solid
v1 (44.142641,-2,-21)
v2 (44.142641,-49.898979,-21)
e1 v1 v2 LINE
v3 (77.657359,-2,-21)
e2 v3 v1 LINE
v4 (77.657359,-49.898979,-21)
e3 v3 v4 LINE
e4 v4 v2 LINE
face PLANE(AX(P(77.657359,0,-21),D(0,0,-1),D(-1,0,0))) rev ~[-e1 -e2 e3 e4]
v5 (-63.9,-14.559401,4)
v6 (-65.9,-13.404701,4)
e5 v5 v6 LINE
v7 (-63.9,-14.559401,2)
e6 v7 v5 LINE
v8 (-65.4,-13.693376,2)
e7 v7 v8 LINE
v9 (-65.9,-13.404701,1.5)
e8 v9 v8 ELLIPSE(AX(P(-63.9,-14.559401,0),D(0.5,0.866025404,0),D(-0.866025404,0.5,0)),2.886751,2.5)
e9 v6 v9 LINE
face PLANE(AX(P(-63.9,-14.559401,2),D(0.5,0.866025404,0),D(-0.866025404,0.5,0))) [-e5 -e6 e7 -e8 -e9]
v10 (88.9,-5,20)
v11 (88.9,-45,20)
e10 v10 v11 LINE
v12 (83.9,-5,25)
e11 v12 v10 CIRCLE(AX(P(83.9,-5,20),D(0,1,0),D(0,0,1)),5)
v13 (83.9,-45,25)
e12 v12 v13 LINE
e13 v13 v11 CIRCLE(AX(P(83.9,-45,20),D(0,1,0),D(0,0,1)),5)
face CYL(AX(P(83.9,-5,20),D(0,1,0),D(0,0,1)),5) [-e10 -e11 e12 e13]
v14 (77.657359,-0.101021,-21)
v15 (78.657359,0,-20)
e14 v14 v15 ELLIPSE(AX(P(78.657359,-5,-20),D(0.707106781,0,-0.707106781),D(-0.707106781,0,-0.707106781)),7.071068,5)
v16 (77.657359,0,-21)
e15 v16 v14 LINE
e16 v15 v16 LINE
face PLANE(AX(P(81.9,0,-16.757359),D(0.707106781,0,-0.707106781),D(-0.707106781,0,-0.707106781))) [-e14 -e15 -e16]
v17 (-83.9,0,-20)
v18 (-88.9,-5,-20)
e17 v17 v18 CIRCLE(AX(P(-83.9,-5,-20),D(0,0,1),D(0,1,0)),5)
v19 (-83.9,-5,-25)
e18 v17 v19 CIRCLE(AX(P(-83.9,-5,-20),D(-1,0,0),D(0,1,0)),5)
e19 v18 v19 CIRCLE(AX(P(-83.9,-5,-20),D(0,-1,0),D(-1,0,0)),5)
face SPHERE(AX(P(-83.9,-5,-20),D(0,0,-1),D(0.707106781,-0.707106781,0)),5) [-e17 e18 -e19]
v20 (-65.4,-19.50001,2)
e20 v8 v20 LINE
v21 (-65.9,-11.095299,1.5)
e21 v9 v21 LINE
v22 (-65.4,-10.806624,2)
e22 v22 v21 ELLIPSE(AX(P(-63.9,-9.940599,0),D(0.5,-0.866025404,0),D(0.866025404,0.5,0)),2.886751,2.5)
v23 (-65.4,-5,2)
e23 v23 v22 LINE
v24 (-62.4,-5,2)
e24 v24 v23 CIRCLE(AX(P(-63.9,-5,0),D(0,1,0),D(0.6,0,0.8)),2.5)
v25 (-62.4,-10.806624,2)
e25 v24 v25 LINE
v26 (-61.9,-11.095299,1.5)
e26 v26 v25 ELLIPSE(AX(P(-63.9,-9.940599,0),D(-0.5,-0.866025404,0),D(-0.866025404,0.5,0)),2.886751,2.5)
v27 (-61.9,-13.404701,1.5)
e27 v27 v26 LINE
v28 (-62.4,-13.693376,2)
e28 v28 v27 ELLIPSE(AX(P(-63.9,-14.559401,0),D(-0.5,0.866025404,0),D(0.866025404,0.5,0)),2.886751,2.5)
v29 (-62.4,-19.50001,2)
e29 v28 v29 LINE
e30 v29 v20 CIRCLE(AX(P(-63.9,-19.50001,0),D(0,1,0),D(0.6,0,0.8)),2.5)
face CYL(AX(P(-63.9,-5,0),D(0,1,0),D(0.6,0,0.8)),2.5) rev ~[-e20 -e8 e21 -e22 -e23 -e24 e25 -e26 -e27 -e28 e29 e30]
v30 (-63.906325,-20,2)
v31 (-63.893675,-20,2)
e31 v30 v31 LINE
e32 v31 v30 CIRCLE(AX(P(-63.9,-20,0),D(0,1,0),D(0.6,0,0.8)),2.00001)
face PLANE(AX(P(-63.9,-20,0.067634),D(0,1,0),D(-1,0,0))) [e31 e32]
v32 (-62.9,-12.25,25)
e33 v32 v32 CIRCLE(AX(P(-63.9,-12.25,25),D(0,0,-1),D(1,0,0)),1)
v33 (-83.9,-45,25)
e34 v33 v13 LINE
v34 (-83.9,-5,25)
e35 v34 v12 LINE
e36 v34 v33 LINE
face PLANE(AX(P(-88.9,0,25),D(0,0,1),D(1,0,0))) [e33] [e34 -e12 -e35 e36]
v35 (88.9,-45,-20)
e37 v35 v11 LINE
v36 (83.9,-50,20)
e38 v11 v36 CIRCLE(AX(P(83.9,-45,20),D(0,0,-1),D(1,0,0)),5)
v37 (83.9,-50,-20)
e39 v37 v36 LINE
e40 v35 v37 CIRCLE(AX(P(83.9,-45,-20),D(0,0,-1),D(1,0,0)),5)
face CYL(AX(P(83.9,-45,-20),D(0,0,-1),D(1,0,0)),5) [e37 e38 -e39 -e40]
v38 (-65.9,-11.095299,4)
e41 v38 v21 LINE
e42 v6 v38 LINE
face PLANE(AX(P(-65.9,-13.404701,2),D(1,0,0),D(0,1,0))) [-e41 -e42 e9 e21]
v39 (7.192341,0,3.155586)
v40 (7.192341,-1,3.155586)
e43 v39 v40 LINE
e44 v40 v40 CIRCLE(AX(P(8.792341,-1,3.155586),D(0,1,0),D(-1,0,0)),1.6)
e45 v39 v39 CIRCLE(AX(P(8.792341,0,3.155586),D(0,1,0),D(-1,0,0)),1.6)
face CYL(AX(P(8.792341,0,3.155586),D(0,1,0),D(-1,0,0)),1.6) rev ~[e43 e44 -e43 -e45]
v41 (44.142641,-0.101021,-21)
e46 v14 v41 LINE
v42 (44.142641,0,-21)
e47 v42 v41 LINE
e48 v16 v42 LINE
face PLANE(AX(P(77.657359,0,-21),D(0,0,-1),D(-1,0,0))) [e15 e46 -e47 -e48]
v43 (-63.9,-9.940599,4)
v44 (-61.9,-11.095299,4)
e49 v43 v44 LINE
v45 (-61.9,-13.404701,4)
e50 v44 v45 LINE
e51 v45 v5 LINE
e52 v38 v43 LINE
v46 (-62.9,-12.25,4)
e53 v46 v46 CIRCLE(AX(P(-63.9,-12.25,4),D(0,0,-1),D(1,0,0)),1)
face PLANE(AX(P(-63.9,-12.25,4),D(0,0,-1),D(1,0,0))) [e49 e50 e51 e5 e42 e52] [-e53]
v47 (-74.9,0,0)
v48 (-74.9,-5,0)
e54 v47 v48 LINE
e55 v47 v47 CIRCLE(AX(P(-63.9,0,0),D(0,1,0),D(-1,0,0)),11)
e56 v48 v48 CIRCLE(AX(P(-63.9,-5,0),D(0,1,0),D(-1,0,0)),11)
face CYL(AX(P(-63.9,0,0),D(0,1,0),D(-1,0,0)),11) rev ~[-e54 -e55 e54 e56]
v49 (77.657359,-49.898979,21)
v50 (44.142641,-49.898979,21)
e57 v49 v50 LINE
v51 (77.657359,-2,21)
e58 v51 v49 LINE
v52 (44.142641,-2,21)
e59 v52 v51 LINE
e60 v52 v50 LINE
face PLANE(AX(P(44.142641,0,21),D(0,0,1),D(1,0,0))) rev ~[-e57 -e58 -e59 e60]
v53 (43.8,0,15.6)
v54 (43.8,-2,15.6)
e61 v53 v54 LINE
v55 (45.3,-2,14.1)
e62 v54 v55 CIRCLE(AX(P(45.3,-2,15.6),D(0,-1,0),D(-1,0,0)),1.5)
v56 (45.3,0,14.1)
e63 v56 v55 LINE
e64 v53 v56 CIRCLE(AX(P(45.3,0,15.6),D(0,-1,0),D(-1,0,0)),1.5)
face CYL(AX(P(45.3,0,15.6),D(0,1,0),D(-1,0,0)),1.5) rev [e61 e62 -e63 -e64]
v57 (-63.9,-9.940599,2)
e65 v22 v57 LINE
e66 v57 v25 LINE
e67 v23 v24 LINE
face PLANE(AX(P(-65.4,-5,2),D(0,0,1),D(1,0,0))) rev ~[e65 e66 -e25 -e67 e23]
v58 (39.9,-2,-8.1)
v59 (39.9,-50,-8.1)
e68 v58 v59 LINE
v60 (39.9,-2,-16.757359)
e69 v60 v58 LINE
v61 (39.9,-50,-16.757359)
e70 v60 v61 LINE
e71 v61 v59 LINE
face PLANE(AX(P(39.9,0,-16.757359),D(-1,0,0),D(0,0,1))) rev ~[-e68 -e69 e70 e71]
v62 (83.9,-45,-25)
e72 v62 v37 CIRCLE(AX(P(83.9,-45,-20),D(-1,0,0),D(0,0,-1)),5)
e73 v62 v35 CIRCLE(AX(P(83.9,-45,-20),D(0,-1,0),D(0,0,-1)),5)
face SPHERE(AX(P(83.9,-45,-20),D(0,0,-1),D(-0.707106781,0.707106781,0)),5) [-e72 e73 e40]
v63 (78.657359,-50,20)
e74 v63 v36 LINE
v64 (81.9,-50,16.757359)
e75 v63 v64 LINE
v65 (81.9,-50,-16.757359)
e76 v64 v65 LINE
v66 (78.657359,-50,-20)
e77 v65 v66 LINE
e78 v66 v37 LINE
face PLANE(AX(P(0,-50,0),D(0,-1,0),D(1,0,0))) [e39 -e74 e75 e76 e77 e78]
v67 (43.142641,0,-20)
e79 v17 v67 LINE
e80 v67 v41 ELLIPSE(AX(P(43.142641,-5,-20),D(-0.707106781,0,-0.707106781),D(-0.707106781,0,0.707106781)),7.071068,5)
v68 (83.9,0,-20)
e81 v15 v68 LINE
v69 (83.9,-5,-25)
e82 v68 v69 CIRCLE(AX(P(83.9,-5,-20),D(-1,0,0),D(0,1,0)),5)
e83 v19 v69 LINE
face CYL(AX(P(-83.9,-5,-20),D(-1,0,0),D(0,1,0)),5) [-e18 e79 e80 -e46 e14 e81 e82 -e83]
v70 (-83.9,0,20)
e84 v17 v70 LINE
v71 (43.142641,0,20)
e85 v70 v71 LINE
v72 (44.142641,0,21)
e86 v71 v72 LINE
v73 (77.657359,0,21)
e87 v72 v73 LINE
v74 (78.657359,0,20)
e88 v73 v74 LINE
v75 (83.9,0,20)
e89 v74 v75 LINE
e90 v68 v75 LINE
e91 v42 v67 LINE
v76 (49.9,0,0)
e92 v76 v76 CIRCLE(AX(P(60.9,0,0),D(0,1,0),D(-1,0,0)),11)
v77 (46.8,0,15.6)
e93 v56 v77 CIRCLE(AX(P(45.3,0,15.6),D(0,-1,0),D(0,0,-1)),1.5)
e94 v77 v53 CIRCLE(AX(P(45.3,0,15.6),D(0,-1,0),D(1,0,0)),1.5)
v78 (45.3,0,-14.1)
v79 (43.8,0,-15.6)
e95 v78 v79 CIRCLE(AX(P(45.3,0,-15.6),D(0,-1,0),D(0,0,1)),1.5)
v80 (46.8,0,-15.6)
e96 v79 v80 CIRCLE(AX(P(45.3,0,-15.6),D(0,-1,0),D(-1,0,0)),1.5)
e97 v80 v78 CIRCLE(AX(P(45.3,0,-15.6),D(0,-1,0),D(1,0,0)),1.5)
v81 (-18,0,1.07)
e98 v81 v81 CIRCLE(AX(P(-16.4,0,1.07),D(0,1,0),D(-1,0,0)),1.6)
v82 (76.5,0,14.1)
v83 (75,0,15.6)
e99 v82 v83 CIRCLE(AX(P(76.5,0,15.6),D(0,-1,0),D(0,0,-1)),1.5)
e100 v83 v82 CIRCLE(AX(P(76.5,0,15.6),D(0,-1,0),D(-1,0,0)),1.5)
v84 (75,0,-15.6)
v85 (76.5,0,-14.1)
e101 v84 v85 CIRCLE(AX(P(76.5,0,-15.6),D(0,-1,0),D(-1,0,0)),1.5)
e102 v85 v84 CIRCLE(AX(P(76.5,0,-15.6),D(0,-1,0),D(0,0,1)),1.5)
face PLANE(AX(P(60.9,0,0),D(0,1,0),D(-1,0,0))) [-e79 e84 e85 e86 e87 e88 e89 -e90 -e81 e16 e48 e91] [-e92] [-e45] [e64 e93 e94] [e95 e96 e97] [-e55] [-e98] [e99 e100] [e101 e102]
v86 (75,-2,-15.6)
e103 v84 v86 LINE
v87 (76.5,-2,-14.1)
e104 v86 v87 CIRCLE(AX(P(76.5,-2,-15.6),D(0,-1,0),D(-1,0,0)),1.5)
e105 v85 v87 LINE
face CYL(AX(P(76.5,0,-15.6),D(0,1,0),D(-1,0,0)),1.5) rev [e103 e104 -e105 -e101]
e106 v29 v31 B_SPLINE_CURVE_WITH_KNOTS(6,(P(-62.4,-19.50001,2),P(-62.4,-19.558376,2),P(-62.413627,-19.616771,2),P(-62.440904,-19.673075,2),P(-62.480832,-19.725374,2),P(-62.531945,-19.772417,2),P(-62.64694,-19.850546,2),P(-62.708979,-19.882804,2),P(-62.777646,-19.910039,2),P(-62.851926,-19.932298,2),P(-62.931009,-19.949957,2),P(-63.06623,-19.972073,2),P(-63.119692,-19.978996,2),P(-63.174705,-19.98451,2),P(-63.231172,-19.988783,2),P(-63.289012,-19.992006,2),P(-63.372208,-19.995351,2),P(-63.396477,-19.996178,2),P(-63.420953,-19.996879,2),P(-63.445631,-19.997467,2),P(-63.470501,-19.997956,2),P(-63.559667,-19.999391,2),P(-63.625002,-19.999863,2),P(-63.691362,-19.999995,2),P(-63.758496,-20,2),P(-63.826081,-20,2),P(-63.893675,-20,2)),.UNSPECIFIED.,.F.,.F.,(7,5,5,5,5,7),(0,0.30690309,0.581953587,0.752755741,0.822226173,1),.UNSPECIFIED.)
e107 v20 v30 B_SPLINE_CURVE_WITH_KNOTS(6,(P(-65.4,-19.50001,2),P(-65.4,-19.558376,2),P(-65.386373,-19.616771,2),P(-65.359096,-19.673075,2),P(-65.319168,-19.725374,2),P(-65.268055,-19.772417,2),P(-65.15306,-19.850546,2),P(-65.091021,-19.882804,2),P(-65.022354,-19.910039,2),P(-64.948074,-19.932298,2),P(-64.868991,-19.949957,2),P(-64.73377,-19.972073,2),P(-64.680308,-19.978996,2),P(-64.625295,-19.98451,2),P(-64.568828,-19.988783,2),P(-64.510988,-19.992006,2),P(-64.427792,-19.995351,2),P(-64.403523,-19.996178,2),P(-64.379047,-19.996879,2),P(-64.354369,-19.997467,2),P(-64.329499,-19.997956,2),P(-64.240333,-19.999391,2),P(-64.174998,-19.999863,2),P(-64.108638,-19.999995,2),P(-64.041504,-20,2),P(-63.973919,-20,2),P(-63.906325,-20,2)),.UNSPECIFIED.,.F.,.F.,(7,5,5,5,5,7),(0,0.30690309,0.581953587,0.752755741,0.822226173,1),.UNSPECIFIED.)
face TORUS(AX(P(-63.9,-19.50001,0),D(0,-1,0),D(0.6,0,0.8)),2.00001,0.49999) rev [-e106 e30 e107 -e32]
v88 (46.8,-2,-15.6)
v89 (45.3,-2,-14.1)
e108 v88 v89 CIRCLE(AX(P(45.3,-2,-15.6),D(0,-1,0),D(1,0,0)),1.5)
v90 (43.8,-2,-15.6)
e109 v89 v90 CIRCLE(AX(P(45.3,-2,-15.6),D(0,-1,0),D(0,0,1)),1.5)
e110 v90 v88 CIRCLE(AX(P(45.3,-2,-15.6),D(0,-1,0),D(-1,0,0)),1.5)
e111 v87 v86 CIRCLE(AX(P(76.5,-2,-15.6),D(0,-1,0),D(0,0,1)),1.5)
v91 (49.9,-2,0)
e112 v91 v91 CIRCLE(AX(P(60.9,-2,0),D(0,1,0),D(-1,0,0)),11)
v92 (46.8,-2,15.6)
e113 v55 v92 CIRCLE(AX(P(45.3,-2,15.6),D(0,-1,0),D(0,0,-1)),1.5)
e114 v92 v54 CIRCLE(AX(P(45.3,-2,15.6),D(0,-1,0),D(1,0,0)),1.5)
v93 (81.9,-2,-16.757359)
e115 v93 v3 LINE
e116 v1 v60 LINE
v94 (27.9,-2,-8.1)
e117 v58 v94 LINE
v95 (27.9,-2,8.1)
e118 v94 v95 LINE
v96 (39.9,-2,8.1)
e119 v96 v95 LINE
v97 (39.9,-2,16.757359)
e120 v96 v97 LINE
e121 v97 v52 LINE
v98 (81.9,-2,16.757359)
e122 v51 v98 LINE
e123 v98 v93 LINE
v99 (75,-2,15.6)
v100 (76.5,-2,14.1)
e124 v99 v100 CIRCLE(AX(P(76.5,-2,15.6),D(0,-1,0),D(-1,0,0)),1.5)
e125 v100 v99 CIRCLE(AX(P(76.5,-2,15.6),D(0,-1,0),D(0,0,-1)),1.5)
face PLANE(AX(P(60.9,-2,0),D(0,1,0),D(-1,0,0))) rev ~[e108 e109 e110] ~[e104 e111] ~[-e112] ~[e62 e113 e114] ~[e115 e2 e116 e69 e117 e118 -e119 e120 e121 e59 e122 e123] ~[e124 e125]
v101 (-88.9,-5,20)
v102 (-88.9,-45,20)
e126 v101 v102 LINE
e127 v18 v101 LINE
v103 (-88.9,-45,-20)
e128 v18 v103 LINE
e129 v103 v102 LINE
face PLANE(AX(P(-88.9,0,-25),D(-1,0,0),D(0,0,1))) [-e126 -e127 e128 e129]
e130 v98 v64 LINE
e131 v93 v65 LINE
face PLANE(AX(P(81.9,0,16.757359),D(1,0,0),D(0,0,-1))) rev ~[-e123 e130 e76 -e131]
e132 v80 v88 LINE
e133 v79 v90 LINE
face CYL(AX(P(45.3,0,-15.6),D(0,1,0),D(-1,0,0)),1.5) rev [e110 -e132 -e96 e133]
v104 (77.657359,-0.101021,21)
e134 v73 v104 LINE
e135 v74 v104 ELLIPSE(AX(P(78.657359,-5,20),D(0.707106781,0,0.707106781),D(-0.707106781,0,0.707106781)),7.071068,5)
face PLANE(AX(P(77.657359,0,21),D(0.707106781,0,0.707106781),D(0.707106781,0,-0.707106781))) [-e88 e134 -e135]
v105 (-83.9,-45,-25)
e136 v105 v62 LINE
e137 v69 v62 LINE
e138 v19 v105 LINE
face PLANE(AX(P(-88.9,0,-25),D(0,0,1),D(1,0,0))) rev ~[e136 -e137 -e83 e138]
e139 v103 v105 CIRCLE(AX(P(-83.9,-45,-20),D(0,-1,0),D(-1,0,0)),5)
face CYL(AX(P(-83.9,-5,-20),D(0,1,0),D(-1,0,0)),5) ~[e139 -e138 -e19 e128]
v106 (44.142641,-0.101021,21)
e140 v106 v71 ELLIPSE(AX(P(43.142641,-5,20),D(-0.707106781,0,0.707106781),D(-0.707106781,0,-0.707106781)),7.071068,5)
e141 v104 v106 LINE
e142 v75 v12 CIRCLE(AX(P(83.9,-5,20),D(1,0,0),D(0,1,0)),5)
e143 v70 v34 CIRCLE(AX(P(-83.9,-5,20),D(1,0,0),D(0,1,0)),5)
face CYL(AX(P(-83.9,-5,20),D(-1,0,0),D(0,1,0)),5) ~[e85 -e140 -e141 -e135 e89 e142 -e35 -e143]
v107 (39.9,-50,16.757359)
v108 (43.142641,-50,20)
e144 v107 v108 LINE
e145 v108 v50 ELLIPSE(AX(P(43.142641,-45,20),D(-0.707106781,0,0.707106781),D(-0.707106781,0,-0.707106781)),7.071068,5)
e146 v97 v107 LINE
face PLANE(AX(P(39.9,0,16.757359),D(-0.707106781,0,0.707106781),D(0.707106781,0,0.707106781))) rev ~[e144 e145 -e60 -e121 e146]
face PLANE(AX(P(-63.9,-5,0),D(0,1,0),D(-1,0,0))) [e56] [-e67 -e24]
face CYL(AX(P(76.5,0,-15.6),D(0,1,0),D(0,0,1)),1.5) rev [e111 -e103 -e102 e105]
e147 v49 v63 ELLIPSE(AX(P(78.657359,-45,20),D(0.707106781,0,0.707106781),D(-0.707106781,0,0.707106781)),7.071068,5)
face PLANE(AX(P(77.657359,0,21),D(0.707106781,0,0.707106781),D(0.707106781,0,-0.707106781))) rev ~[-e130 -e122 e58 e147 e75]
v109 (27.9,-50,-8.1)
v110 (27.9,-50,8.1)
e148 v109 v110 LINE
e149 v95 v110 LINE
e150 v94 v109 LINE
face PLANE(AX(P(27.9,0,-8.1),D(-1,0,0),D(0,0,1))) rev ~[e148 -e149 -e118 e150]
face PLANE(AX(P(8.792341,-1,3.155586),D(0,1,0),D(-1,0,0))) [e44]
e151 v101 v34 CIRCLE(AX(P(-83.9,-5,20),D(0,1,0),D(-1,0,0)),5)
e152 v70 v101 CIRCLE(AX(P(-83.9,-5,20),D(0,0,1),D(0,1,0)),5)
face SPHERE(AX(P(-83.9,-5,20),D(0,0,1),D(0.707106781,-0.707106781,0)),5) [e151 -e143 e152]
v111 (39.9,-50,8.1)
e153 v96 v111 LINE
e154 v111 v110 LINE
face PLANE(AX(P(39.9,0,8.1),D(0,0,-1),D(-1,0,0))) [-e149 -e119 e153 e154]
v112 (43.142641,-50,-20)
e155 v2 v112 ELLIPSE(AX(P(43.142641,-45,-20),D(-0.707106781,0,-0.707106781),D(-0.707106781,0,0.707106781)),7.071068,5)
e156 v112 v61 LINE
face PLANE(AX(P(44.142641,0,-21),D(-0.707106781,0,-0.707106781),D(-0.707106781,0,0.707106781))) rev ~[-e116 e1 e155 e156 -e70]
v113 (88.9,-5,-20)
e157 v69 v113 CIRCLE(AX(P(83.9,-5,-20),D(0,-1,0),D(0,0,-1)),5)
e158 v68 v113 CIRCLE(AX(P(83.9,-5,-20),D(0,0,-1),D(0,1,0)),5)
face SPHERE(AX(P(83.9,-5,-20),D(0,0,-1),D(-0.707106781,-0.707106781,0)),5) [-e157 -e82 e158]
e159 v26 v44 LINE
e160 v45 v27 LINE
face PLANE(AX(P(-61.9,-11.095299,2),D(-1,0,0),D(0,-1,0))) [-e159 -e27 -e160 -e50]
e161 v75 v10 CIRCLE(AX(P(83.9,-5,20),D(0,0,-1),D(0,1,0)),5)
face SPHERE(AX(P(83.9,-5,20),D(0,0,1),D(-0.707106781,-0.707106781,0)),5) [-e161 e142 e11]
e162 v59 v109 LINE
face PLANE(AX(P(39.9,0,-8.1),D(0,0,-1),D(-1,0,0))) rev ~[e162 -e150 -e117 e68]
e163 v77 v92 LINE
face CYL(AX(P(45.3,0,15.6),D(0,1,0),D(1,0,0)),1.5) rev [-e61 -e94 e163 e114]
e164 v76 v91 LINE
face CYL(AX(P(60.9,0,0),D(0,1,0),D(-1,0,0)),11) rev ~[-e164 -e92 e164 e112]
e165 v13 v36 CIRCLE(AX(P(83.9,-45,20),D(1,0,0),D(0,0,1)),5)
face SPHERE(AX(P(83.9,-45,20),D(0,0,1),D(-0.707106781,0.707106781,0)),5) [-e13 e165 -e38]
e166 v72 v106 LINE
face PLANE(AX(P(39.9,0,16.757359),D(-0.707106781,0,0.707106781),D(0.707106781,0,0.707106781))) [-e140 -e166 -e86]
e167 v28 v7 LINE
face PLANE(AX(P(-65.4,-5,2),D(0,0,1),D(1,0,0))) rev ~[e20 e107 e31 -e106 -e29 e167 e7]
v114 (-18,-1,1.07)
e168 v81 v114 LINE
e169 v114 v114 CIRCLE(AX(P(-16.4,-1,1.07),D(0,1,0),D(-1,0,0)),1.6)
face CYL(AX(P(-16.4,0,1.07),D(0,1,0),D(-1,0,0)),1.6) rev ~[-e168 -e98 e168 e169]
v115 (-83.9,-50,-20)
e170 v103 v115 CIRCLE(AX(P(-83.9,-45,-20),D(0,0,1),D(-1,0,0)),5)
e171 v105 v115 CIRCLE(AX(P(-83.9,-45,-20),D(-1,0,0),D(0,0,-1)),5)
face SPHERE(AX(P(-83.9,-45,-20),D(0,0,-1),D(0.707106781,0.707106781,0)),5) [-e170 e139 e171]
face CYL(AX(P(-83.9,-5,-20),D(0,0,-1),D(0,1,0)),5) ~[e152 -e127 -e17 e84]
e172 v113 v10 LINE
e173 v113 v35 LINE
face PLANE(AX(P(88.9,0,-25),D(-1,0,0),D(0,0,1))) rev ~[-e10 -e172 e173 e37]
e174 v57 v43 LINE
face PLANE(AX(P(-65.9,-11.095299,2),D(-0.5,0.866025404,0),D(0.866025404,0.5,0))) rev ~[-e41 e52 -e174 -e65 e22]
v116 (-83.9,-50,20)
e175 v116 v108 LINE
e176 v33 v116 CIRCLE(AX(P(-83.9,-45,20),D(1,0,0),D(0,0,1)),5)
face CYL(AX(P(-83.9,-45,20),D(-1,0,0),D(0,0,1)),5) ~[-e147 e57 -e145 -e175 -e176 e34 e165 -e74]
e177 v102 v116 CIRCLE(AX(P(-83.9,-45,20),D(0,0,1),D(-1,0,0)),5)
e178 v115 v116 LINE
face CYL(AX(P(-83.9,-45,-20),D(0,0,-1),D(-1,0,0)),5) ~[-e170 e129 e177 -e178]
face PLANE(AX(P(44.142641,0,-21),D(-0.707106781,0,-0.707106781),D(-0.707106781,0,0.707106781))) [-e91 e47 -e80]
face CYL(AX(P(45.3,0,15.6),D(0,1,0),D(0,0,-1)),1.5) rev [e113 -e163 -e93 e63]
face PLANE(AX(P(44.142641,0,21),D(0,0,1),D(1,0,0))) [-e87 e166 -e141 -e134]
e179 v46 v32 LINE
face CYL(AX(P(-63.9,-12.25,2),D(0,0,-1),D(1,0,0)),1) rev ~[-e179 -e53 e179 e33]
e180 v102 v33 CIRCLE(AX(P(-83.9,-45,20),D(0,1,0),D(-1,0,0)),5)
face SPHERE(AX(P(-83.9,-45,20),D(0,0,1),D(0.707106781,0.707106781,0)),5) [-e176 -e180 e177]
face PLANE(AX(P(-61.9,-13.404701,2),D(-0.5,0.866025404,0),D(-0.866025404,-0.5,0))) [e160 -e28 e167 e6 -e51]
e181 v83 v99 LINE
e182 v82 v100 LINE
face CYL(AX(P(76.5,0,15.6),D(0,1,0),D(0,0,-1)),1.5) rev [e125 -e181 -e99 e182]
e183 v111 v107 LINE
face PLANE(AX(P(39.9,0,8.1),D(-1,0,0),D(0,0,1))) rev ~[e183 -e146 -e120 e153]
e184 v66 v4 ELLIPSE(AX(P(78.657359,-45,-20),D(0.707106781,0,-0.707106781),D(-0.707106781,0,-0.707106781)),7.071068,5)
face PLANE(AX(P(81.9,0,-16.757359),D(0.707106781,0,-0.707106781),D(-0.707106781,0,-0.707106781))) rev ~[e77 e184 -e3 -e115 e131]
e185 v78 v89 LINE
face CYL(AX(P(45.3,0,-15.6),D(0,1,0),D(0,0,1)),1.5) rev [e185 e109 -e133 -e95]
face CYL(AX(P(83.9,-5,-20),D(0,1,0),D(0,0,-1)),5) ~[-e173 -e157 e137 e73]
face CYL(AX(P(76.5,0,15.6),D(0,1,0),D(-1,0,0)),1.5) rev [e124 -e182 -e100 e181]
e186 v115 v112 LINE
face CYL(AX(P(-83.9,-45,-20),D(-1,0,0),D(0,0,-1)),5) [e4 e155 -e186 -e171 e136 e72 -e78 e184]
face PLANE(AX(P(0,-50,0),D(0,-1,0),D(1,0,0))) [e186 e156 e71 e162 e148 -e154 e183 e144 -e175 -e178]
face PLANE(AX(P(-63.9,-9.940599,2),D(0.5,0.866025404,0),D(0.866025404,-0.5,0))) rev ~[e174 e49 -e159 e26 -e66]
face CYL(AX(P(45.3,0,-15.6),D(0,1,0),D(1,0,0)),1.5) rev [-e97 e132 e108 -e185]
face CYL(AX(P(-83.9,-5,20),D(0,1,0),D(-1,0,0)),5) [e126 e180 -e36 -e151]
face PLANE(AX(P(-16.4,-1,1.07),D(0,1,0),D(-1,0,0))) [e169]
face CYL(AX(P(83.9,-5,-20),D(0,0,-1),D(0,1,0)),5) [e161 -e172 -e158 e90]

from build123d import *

# Parameters (mm, degrees)
F0_W           = 177.8
F0_H           = 50
F1_DEPTH       = 50
F2_W           = 12
F2_H           = 16.2
F3_DEPTH       = 50
F4_R           = 11
F5_DEPTH       = 5
F7_DEPTH       = 15
F8_R           = 0.49999
F9_T1_DEPTH    = 40
F9_T3_DEPTH    = 167.8
F9_T5_DEPTH    = 40
F9_S9_W        = 5
F9_S9_H        = 5
F9_T10_DEPTH   = 5
F9_S15_W       = 5
F9_S15_H       = 5
F9_T16_DEPTH   = 5
F9_S21_W       = 5
F9_S21_H       = 5
F9_T22_DEPTH   = 5
F9_S27_W       = 5
F9_S27_H       = 5
F9_T28_DEPTH   = 5
F9_S33_W       = 5
F9_S33_H       = 5
F9_T34_DEPTH   = 5
F9_S39_W       = 5
F9_S39_H       = 5
F9_T40_DEPTH   = 5
F9_S45_W       = 5
F9_S45_H       = 5
F9_T46_DEPTH   = 5
F9_S51_W       = 5
F9_S51_H       = 5
F9_T52_DEPTH   = 5
F10_R          = 1.6
F11_DEPTH      = 1
F12_R          = 1
F13_DEPTH      = 2
F13_DEPTH_BACK = 1
F14_DEPTH      = 25
F15_DEPTH      = 2
F16_R          = 11
F17_DEPTH      = 25


# Not quite as in the source:
# - a fillet or chamfer that OpenCascade refuses, or shapes differently, is made with other operations: its cross-section is extruded or revolved along the edge and cut away or added
# - a fillet or chamfer is up to 0.001 mm smaller than in the source, because OpenCascade refuses the exact size


with BuildPart() as f1:
    # F0 (on Front) → F1 (new body)
    with BuildSketch(Plane.XZ):
        Rectangle(F0_W, F0_H)
    extrude(amount=F1_DEPTH)

    # F2 (on face) → F3 (cut, through all)
    with BuildSketch(Plane(origin=(0, 0, 0), x_dir=(-1, 0, 0), z_dir=(0, 1, 0))):
        Polygon((-44.1426406871, 21), (-77.6573593129, 21), (-81.9, 16.7573593129), (-81.9, -16.7573593129), (-77.6573593129, -21), (-44.1426406871, -21), (-39.9, -16.7573593129), (-39.9, -8.1), (-39.9, 8.1), (-39.9, 16.7573593129), align=None)
        with BuildLine():
            ThreePointArc((-75, -15.6), (-77.5606601718, -16.6606601718), (-76.5, -14.1))
            Line((-76.5, -14.1), (-76.5, 14.1))
            ThreePointArc((-76.5, 14.1), (-77.5606601718, 16.6606601718), (-75, 15.6))
            Line((-75, 15.6), (-46.8, 15.6))
            ThreePointArc((-46.8, 15.6), (-45.3, 17.1), (-43.8, 15.6))
            ThreePointArc((-43.8, 15.6), (-44.2393398282, 14.5393398282), (-45.3, 14.1))
            Line((-45.3, 14.1), (-45.3, -14.1))
            ThreePointArc((-45.3, -14.1), (-44.2393398282, -14.5393398282), (-43.8, -15.6))
            ThreePointArc((-43.8, -15.6), (-45.3, -17.1), (-46.8, -15.6))
            Line((-46.8, -15.6), (-75, -15.6))
        make_face(mode=Mode.SUBTRACT)
        with Locations((-33.9, 0)):
            Rectangle(F2_W, F2_H)
        with BuildLine():
            Line((-75, -15.6), (-76.5, -15.6))
            Line((-76.5, -15.6), (-76.5, -14.1))
            ThreePointArc((-76.5, -14.1), (-77.5606601718, -16.6606601718), (-75, -15.6))
        make_face()
        with BuildLine():
            Line((-76.5, -14.1), (-76.5, -15.6))
            Line((-76.5, -15.6), (-75, -15.6))
            ThreePointArc((-75, -15.6), (-75.4393398282, -14.5393398282), (-76.5, -14.1))
        make_face()
        with BuildLine():
            Line((-76.5, 14.1), (-76.5, -14.1))
            ThreePointArc((-76.5, -14.1), (-75.4393398282, -14.5393398282), (-75, -15.6))
            Line((-75, -15.6), (-46.8, -15.6))
            ThreePointArc((-46.8, -15.6), (-46.3606601718, -14.5393398282), (-45.3, -14.1))
            Line((-45.3, -14.1), (-45.3, 14.1))
            ThreePointArc((-45.3, 14.1), (-46.3606601718, 14.5393398282), (-46.8, 15.6))
            Line((-46.8, 15.6), (-75, 15.6))
            ThreePointArc((-75, 15.6), (-75.4393398282, 14.5393398282), (-76.5, 14.1))
        make_face()
        with BuildLine():
            ThreePointArc((-75, 15.6), (-77.5606601718, 16.6606601718), (-76.5, 14.1))
            Line((-76.5, 14.1), (-76.5, 15.6))
            Line((-76.5, 15.6), (-75, 15.6))
        make_face()
        with BuildLine():
            Line((-76.5, 15.6), (-76.5, 14.1))
            ThreePointArc((-76.5, 14.1), (-75.4393398282, 14.5393398282), (-75, 15.6))
            Line((-75, 15.6), (-76.5, 15.6))
        make_face()
        with BuildLine():
            ThreePointArc((-45.3, -14.1), (-46.3606601718, -14.5393398282), (-46.8, -15.6))
            Line((-46.8, -15.6), (-45.3, -15.6))
            Line((-45.3, -15.6), (-45.3, -14.1))
        make_face()
        with BuildLine():
            Line((-45.3, -15.6), (-46.8, -15.6))
            ThreePointArc((-46.8, -15.6), (-45.3, -17.1), (-43.8, -15.6))
            ThreePointArc((-43.8, -15.6), (-44.2393398282, -14.5393398282), (-45.3, -14.1))
            Line((-45.3, -14.1), (-45.3, -15.6))
        make_face()
        with BuildLine():
            ThreePointArc((-43.8, 15.6), (-45.3, 17.1), (-46.8, 15.6))
            Line((-46.8, 15.6), (-45.3, 15.6))
            Line((-45.3, 15.6), (-45.3, 14.1))
            ThreePointArc((-45.3, 14.1), (-44.2393398282, 14.5393398282), (-43.8, 15.6))
        make_face()
        with BuildLine():
            Line((-45.3, 15.6), (-46.8, 15.6))
            ThreePointArc((-46.8, 15.6), (-46.3606601718, 14.5393398282), (-45.3, 14.1))
            Line((-45.3, 14.1), (-45.3, 15.6))
        make_face()
    extrude(amount=-F3_DEPTH, mode=Mode.SUBTRACT)

    # F4 (on face) → F5 (cut)
    with BuildSketch(Plane(origin=(0, 0, 0), x_dir=(-1, 0, 0), z_dir=(0, 1, 0))):
        with Locations((63.9, 0)):
            Circle(F4_R)
    extrude(amount=-F5_DEPTH, mode=Mode.SUBTRACT)

    # F6 (on face) → F7 (cut)
    with BuildSketch(Plane(origin=(0, -5, 0), x_dir=(-1, 0, 0), z_dir=(0, 1, 0))):
        with BuildLine():
            Line((65.4, 2), (62.4, 2))
            ThreePointArc((62.4, 2), (63.9, -2.5), (65.4, 2))
        make_face()
    extrude(amount=-F7_DEPTH, mode=Mode.SUBTRACT)

    # F8 (radius 0.5 in the source; OpenCascade refuses exactly that, so slightly less here)
    f8_edges = [f1.edges().sort_by_distance(p)[0] for p in [
        (-63.9, -20, -2.5),
    ]]
    fillet(f8_edges, radius=F8_R)

    # F9: fillet of radius 5 on 12 edges, made by hand

    # F9_s2 → F9_t1 (cut)
    with BuildSketch(Plane.XZ.offset(5)):
        with BuildLine():
            ThreePointArc((-88.9, 20), (-87.4355339059, 23.5355339059), (-83.9, 25))
            Line((-83.9, 25), (-88.9, 25))
            Line((-88.9, 25), (-88.9, 20))
        make_face()
        with BuildLine():
            ThreePointArc((83.9, 25), (87.4355339059, 23.5355339059), (88.9, 20))
            Line((88.9, 20), (88.9, 25))
            Line((88.9, 25), (83.9, 25))
        make_face()
        with BuildLine():
            ThreePointArc((-88.9, -20), (-87.4355339059, -23.5355339059), (-83.9, -25))
            Line((-83.9, -25), (-88.9, -25))
            Line((-88.9, -25), (-88.9, -20))
        make_face()
        with BuildLine():
            ThreePointArc((83.9, -25), (87.4355339059, -23.5355339059), (88.9, -20))
            Line((88.9, -20), (88.9, -25))
            Line((88.9, -25), (83.9, -25))
        make_face()
    extrude(amount=F9_T1_DEPTH, mode=Mode.SUBTRACT)

    # F9_s4 → F9_t3 (cut)
    with BuildSketch(Plane.YZ.offset(-83.9)):
        with BuildLine():
            ThreePointArc((-45, 25), (-48.5355339059, 23.5355339059), (-50, 20))
            Line((-50, 20), (-50, 25))
            Line((-50, 25), (-45, 25))
        make_face()
        with BuildLine():
            ThreePointArc((-45, -25), (-48.5355339059, -23.5355339059), (-50, -20))
            Line((-50, -20), (-50, -25))
            Line((-50, -25), (-45, -25))
        make_face()
        with BuildLine():
            ThreePointArc((0, 20), (-1.4644660941, 23.5355339059), (-5, 25))
            Line((-5, 25), (0, 25))
            Line((0, 25), (0, 20))
        make_face()
        with BuildLine():
            ThreePointArc((0, -20), (-1.4644660941, -23.5355339059), (-5, -25))
            Line((-5, -25), (0, -25))
            Line((0, -25), (0, -20))
        make_face()
    extrude(amount=F9_T3_DEPTH, mode=Mode.SUBTRACT)

    # F9_s6 → F9_t5 (cut)
    with BuildSketch(Plane.XY.offset(-20)):
        with BuildLine():
            ThreePointArc((88.9, -45), (87.4355339059, -48.5355339059), (83.9, -50))
            Line((83.9, -50), (88.9, -50))
            Line((88.9, -50), (88.9, -45))
        make_face()
        with BuildLine():
            ThreePointArc((83.9, 0), (87.4355339059, -1.4644660941), (88.9, -5))
            Line((88.9, -5), (88.9, 0))
            Line((88.9, 0), (83.9, 0))
        make_face()
        with BuildLine():
            ThreePointArc((-83.9, 0), (-87.4355339059, -1.4644660941), (-88.9, -5))
            Line((-88.9, -5), (-88.9, 0))
            Line((-88.9, 0), (-83.9, 0))
        make_face()
        with BuildLine():
            ThreePointArc((-88.9, -45), (-87.4355339059, -48.5355339059), (-83.9, -50))
            Line((-83.9, -50), (-88.9, -50))
            Line((-88.9, -50), (-88.9, -45))
        make_face()
    extrude(amount=F9_T5_DEPTH, mode=Mode.SUBTRACT)


with BuildPart() as f9_tool8:
    # F9_s9 → F9_t10 (new body)
    with BuildSketch(Plane.XY.offset(20)):
        with Locations((-86.4, -2.5)):
            Rectangle(F9_S9_W, F9_S9_H)
    extrude(amount=F9_T10_DEPTH)

    # F9_s11 → F9_t12 (revolve, cut)
    with BuildSketch(Plane(origin=(-83.9, -5, 20), x_dir=(0.7071067812, -0.7071067812, 0), z_dir=(-0.7071067812, -0.7071067812, 0))):
        with BuildLine():
            ThreePointArc((0, -5), (5, 0), (0, 5))
            Line((0, 5), (0, -5))
        make_face()
    revolve(axis=Axis((-83.9, -5, 20), (0, 0, 1)), mode=Mode.SUBTRACT)


with BuildPart() as f1_1:
    add(f1.part)

    # F9_t7: cut F9_tool8
    add(f9_tool8.part, mode=Mode.SUBTRACT)


with BuildPart() as f9_tool14:
    # F9_s15 → F9_t16 (new body)
    with BuildSketch(Plane.XY.offset(20)):
        with Locations((-86.4, -47.5)):
            Rectangle(F9_S15_W, F9_S15_H)
    extrude(amount=F9_T16_DEPTH)

    # F9_s17 → F9_t18 (revolve, cut)
    with BuildSketch(Plane(origin=(-83.9, -45, 20), x_dir=(0.7071067812, 0.7071067812, 0), z_dir=(0.7071067812, -0.7071067812, 0))):
        with BuildLine():
            ThreePointArc((0, -5), (5, 0), (0, 5))
            Line((0, 5), (0, -5))
        make_face()
    revolve(axis=Axis((-83.9, -45, 20), (0, 0, 1)), mode=Mode.SUBTRACT)


with BuildPart() as f1_2:
    add(f1_1.part)

    # F9_t13: cut F9_tool14
    add(f9_tool14.part, mode=Mode.SUBTRACT)


with BuildPart() as f9_tool20:
    # F9_s21 → F9_t22 (new body)
    with BuildSketch(Plane.XY.offset(20)):
        with Locations((86.4, -47.5)):
            Rectangle(F9_S21_W, F9_S21_H)
    extrude(amount=F9_T22_DEPTH)

    # F9_s23 → F9_t24 (revolve, cut)
    with BuildSketch(Plane(origin=(83.9, -45, 20), x_dir=(-0.7071067812, 0.7071067812, 0), z_dir=(0.7071067812, 0.7071067812, 0))):
        with BuildLine():
            ThreePointArc((0, -5), (5, 0), (0, 5))
            Line((0, 5), (0, -5))
        make_face()
    revolve(axis=Axis((83.9, -45, 20), (0, 0, 1)), mode=Mode.SUBTRACT)


with BuildPart() as f1_3:
    add(f1_2.part)

    # F9_t19: cut F9_tool20
    add(f9_tool20.part, mode=Mode.SUBTRACT)


with BuildPart() as f9_tool26:
    # F9_s27 → F9_t28 (new body)
    with BuildSketch(Plane.XY.offset(-20)):
        with Locations((-86.4, -47.5)):
            Rectangle(F9_S27_W, F9_S27_H)
    extrude(amount=-F9_T28_DEPTH)

    # F9_s29 → F9_t30 (revolve, cut)
    with BuildSketch(Plane(origin=(-83.9, -45, -20), x_dir=(0.7071067812, 0.7071067812, 0), z_dir=(-0.7071067812, 0.7071067812, 0))):
        with BuildLine():
            ThreePointArc((0, -5), (5, 0), (0, 5))
            Line((0, 5), (0, -5))
        make_face()
    revolve(axis=Axis((-83.9, -45, -20), (0, 0, -1)), mode=Mode.SUBTRACT)


with BuildPart() as f1_4:
    add(f1_3.part)

    # F9_t25: cut F9_tool26
    add(f9_tool26.part, mode=Mode.SUBTRACT)


with BuildPart() as f9_tool32:
    # F9_s33 → F9_t34 (new body)
    with BuildSketch(Plane.XY.offset(-20)):
        with Locations((86.4, -47.5)):
            Rectangle(F9_S33_W, F9_S33_H)
    extrude(amount=-F9_T34_DEPTH)

    # F9_s35 → F9_t36 (revolve, cut)
    with BuildSketch(Plane(origin=(83.9, -45, -20), x_dir=(-0.7071067812, 0.7071067812, 0), z_dir=(-0.7071067812, -0.7071067812, 0))):
        with BuildLine():
            ThreePointArc((0, -5), (5, 0), (0, 5))
            Line((0, 5), (0, -5))
        make_face()
    revolve(axis=Axis((83.9, -45, -20), (0, 0, -1)), mode=Mode.SUBTRACT)


with BuildPart() as f1_5:
    add(f1_4.part)

    # F9_t31: cut F9_tool32
    add(f9_tool32.part, mode=Mode.SUBTRACT)


with BuildPart() as f9_tool38:
    # F9_s39 → F9_t40 (new body)
    with BuildSketch(Plane.XY.offset(20)):
        with Locations((86.4, -2.5)):
            Rectangle(F9_S39_W, F9_S39_H)
    extrude(amount=F9_T40_DEPTH)

    # F9_s41 → F9_t42 (revolve, cut)
    with BuildSketch(Plane(origin=(83.9, -5, 20), x_dir=(-0.7071067812, -0.7071067812, 0), z_dir=(-0.7071067812, 0.7071067812, 0))):
        with BuildLine():
            ThreePointArc((0, -5), (5, 0), (0, 5))
            Line((0, 5), (0, -5))
        make_face()
    revolve(axis=Axis((83.9, -5, 20), (0, 0, 1)), mode=Mode.SUBTRACT)


with BuildPart() as f1_6:
    add(f1_5.part)

    # F9_t37: cut F9_tool38
    add(f9_tool38.part, mode=Mode.SUBTRACT)


with BuildPart() as f9_tool44:
    # F9_s45 → F9_t46 (new body)
    with BuildSketch(Plane.XY.offset(-20)):
        with Locations((86.4, -2.5)):
            Rectangle(F9_S45_W, F9_S45_H)
    extrude(amount=-F9_T46_DEPTH)

    # F9_s47 → F9_t48 (revolve, cut)
    with BuildSketch(Plane(origin=(83.9, -5, -20), x_dir=(-0.7071067812, -0.7071067812, 0), z_dir=(0.7071067812, -0.7071067812, 0))):
        with BuildLine():
            ThreePointArc((0, -5), (5, 0), (0, 5))
            Line((0, 5), (0, -5))
        make_face()
    revolve(axis=Axis((83.9, -5, -20), (0, 0, -1)), mode=Mode.SUBTRACT)


with BuildPart() as f1_7:
    add(f1_6.part)

    # F9_t43: cut F9_tool44
    add(f9_tool44.part, mode=Mode.SUBTRACT)


with BuildPart() as f9_tool50:
    # F9_s51 → F9_t52 (new body)
    with BuildSketch(Plane.XY.offset(-20)):
        with Locations((-86.4, -2.5)):
            Rectangle(F9_S51_W, F9_S51_H)
    extrude(amount=-F9_T52_DEPTH)

    # F9_s53 → F9_t54 (revolve, cut)
    with BuildSketch(Plane(origin=(-83.9, -5, -20), x_dir=(0.7071067812, -0.7071067812, 0), z_dir=(0.7071067812, 0.7071067812, 0))):
        with BuildLine():
            ThreePointArc((0, -5), (5, 0), (0, 5))
            Line((0, 5), (0, -5))
        make_face()
    revolve(axis=Axis((-83.9, -5, -20), (0, 0, -1)), mode=Mode.SUBTRACT)


with BuildPart() as f1_8:
    add(f1_7.part)

    # F9_t49: cut F9_tool50
    add(f9_tool50.part, mode=Mode.SUBTRACT)

    # F10 (on face) → F11 (cut)
    with BuildSketch(Plane(origin=(0, 0, 0), x_dir=(-1, 0, 0), z_dir=(0, 1, 0))):
        with Locations((16.4, 1.07)):
            Circle(F10_R)
        with Locations((-8.7923407305, 3.1555858932)):
            Circle(F10_R)
    extrude(amount=-F11_DEPTH, mode=Mode.SUBTRACT)

    # F12 (on face) → F13 (cut, two sides)
    with BuildSketch(Plane(origin=(0, 0, 2), x_dir=(1, 0, 0), z_dir=(0, 0, -1))) as f13_sk:
        Polygon((-61.9, 13.4047005384), (-63.9, 14.5594010768), (-65.9, 13.4047005384), (-65.9, 11.0952994616), (-63.9, 9.9405989232), (-61.9, 11.0952994616), align=None)
        with Locations((-63.9, 12.25)):
            Circle(F12_R, mode=Mode.SUBTRACT)
    extrude(amount=-F13_DEPTH, mode=Mode.SUBTRACT)
    extrude(f13_sk.sketch, amount=F13_DEPTH_BACK, mode=Mode.SUBTRACT)

    # F12 (on face) → F14 (cut)
    with BuildSketch(Plane(origin=(0, 0, 2), x_dir=(1, 0, 0), z_dir=(0, 0, -1))):
        with Locations((-63.9, 12.25)):
            Circle(F12_R)
    extrude(amount=-F14_DEPTH, mode=Mode.SUBTRACT)

    # F2 (on face) → F15 (join)
    with BuildSketch(Plane(origin=(0, 0, 0), x_dir=(-1, 0, 0), z_dir=(0, 1, 0))):
        Polygon((-44.1426406871, 21), (-77.6573593129, 21), (-81.9, 16.7573593129), (-81.9, -16.7573593129), (-77.6573593129, -21), (-44.1426406871, -21), (-39.9, -16.7573593129), (-39.9, -8.1), (-39.9, 8.1), (-39.9, 16.7573593129), align=None)
        with BuildLine():
            ThreePointArc((-75, -15.6), (-77.5606601718, -16.6606601718), (-76.5, -14.1))
            Line((-76.5, -14.1), (-76.5, 14.1))
            ThreePointArc((-76.5, 14.1), (-77.5606601718, 16.6606601718), (-75, 15.6))
            Line((-75, 15.6), (-46.8, 15.6))
            ThreePointArc((-46.8, 15.6), (-45.3, 17.1), (-43.8, 15.6))
            ThreePointArc((-43.8, 15.6), (-44.2393398282, 14.5393398282), (-45.3, 14.1))
            Line((-45.3, 14.1), (-45.3, -14.1))
            ThreePointArc((-45.3, -14.1), (-44.2393398282, -14.5393398282), (-43.8, -15.6))
            ThreePointArc((-43.8, -15.6), (-45.3, -17.1), (-46.8, -15.6))
            Line((-46.8, -15.6), (-75, -15.6))
        make_face(mode=Mode.SUBTRACT)
        with Locations((-33.9, 0)):
            Rectangle(F2_W, F2_H)
        with BuildLine():
            Line((-76.5, 14.1), (-76.5, -14.1))
            ThreePointArc((-76.5, -14.1), (-75.4393398282, -14.5393398282), (-75, -15.6))
            Line((-75, -15.6), (-46.8, -15.6))
            ThreePointArc((-46.8, -15.6), (-46.3606601718, -14.5393398282), (-45.3, -14.1))
            Line((-45.3, -14.1), (-45.3, 14.1))
            ThreePointArc((-45.3, 14.1), (-46.3606601718, 14.5393398282), (-46.8, 15.6))
            Line((-46.8, 15.6), (-75, 15.6))
            ThreePointArc((-75, 15.6), (-75.4393398282, 14.5393398282), (-76.5, 14.1))
        make_face()
    extrude(amount=-F15_DEPTH)

    # F16 (on face) → F17 (cut)
    with BuildSketch(Plane(origin=(0, 0, 0), x_dir=(-1, 0, 0), z_dir=(0, 1, 0))):
        with Locations((-60.9, 0)):
            Circle(F16_R)
    extrude(amount=-F17_DEPTH, mode=Mode.SUBTRACT)


solid = f1_8.part
